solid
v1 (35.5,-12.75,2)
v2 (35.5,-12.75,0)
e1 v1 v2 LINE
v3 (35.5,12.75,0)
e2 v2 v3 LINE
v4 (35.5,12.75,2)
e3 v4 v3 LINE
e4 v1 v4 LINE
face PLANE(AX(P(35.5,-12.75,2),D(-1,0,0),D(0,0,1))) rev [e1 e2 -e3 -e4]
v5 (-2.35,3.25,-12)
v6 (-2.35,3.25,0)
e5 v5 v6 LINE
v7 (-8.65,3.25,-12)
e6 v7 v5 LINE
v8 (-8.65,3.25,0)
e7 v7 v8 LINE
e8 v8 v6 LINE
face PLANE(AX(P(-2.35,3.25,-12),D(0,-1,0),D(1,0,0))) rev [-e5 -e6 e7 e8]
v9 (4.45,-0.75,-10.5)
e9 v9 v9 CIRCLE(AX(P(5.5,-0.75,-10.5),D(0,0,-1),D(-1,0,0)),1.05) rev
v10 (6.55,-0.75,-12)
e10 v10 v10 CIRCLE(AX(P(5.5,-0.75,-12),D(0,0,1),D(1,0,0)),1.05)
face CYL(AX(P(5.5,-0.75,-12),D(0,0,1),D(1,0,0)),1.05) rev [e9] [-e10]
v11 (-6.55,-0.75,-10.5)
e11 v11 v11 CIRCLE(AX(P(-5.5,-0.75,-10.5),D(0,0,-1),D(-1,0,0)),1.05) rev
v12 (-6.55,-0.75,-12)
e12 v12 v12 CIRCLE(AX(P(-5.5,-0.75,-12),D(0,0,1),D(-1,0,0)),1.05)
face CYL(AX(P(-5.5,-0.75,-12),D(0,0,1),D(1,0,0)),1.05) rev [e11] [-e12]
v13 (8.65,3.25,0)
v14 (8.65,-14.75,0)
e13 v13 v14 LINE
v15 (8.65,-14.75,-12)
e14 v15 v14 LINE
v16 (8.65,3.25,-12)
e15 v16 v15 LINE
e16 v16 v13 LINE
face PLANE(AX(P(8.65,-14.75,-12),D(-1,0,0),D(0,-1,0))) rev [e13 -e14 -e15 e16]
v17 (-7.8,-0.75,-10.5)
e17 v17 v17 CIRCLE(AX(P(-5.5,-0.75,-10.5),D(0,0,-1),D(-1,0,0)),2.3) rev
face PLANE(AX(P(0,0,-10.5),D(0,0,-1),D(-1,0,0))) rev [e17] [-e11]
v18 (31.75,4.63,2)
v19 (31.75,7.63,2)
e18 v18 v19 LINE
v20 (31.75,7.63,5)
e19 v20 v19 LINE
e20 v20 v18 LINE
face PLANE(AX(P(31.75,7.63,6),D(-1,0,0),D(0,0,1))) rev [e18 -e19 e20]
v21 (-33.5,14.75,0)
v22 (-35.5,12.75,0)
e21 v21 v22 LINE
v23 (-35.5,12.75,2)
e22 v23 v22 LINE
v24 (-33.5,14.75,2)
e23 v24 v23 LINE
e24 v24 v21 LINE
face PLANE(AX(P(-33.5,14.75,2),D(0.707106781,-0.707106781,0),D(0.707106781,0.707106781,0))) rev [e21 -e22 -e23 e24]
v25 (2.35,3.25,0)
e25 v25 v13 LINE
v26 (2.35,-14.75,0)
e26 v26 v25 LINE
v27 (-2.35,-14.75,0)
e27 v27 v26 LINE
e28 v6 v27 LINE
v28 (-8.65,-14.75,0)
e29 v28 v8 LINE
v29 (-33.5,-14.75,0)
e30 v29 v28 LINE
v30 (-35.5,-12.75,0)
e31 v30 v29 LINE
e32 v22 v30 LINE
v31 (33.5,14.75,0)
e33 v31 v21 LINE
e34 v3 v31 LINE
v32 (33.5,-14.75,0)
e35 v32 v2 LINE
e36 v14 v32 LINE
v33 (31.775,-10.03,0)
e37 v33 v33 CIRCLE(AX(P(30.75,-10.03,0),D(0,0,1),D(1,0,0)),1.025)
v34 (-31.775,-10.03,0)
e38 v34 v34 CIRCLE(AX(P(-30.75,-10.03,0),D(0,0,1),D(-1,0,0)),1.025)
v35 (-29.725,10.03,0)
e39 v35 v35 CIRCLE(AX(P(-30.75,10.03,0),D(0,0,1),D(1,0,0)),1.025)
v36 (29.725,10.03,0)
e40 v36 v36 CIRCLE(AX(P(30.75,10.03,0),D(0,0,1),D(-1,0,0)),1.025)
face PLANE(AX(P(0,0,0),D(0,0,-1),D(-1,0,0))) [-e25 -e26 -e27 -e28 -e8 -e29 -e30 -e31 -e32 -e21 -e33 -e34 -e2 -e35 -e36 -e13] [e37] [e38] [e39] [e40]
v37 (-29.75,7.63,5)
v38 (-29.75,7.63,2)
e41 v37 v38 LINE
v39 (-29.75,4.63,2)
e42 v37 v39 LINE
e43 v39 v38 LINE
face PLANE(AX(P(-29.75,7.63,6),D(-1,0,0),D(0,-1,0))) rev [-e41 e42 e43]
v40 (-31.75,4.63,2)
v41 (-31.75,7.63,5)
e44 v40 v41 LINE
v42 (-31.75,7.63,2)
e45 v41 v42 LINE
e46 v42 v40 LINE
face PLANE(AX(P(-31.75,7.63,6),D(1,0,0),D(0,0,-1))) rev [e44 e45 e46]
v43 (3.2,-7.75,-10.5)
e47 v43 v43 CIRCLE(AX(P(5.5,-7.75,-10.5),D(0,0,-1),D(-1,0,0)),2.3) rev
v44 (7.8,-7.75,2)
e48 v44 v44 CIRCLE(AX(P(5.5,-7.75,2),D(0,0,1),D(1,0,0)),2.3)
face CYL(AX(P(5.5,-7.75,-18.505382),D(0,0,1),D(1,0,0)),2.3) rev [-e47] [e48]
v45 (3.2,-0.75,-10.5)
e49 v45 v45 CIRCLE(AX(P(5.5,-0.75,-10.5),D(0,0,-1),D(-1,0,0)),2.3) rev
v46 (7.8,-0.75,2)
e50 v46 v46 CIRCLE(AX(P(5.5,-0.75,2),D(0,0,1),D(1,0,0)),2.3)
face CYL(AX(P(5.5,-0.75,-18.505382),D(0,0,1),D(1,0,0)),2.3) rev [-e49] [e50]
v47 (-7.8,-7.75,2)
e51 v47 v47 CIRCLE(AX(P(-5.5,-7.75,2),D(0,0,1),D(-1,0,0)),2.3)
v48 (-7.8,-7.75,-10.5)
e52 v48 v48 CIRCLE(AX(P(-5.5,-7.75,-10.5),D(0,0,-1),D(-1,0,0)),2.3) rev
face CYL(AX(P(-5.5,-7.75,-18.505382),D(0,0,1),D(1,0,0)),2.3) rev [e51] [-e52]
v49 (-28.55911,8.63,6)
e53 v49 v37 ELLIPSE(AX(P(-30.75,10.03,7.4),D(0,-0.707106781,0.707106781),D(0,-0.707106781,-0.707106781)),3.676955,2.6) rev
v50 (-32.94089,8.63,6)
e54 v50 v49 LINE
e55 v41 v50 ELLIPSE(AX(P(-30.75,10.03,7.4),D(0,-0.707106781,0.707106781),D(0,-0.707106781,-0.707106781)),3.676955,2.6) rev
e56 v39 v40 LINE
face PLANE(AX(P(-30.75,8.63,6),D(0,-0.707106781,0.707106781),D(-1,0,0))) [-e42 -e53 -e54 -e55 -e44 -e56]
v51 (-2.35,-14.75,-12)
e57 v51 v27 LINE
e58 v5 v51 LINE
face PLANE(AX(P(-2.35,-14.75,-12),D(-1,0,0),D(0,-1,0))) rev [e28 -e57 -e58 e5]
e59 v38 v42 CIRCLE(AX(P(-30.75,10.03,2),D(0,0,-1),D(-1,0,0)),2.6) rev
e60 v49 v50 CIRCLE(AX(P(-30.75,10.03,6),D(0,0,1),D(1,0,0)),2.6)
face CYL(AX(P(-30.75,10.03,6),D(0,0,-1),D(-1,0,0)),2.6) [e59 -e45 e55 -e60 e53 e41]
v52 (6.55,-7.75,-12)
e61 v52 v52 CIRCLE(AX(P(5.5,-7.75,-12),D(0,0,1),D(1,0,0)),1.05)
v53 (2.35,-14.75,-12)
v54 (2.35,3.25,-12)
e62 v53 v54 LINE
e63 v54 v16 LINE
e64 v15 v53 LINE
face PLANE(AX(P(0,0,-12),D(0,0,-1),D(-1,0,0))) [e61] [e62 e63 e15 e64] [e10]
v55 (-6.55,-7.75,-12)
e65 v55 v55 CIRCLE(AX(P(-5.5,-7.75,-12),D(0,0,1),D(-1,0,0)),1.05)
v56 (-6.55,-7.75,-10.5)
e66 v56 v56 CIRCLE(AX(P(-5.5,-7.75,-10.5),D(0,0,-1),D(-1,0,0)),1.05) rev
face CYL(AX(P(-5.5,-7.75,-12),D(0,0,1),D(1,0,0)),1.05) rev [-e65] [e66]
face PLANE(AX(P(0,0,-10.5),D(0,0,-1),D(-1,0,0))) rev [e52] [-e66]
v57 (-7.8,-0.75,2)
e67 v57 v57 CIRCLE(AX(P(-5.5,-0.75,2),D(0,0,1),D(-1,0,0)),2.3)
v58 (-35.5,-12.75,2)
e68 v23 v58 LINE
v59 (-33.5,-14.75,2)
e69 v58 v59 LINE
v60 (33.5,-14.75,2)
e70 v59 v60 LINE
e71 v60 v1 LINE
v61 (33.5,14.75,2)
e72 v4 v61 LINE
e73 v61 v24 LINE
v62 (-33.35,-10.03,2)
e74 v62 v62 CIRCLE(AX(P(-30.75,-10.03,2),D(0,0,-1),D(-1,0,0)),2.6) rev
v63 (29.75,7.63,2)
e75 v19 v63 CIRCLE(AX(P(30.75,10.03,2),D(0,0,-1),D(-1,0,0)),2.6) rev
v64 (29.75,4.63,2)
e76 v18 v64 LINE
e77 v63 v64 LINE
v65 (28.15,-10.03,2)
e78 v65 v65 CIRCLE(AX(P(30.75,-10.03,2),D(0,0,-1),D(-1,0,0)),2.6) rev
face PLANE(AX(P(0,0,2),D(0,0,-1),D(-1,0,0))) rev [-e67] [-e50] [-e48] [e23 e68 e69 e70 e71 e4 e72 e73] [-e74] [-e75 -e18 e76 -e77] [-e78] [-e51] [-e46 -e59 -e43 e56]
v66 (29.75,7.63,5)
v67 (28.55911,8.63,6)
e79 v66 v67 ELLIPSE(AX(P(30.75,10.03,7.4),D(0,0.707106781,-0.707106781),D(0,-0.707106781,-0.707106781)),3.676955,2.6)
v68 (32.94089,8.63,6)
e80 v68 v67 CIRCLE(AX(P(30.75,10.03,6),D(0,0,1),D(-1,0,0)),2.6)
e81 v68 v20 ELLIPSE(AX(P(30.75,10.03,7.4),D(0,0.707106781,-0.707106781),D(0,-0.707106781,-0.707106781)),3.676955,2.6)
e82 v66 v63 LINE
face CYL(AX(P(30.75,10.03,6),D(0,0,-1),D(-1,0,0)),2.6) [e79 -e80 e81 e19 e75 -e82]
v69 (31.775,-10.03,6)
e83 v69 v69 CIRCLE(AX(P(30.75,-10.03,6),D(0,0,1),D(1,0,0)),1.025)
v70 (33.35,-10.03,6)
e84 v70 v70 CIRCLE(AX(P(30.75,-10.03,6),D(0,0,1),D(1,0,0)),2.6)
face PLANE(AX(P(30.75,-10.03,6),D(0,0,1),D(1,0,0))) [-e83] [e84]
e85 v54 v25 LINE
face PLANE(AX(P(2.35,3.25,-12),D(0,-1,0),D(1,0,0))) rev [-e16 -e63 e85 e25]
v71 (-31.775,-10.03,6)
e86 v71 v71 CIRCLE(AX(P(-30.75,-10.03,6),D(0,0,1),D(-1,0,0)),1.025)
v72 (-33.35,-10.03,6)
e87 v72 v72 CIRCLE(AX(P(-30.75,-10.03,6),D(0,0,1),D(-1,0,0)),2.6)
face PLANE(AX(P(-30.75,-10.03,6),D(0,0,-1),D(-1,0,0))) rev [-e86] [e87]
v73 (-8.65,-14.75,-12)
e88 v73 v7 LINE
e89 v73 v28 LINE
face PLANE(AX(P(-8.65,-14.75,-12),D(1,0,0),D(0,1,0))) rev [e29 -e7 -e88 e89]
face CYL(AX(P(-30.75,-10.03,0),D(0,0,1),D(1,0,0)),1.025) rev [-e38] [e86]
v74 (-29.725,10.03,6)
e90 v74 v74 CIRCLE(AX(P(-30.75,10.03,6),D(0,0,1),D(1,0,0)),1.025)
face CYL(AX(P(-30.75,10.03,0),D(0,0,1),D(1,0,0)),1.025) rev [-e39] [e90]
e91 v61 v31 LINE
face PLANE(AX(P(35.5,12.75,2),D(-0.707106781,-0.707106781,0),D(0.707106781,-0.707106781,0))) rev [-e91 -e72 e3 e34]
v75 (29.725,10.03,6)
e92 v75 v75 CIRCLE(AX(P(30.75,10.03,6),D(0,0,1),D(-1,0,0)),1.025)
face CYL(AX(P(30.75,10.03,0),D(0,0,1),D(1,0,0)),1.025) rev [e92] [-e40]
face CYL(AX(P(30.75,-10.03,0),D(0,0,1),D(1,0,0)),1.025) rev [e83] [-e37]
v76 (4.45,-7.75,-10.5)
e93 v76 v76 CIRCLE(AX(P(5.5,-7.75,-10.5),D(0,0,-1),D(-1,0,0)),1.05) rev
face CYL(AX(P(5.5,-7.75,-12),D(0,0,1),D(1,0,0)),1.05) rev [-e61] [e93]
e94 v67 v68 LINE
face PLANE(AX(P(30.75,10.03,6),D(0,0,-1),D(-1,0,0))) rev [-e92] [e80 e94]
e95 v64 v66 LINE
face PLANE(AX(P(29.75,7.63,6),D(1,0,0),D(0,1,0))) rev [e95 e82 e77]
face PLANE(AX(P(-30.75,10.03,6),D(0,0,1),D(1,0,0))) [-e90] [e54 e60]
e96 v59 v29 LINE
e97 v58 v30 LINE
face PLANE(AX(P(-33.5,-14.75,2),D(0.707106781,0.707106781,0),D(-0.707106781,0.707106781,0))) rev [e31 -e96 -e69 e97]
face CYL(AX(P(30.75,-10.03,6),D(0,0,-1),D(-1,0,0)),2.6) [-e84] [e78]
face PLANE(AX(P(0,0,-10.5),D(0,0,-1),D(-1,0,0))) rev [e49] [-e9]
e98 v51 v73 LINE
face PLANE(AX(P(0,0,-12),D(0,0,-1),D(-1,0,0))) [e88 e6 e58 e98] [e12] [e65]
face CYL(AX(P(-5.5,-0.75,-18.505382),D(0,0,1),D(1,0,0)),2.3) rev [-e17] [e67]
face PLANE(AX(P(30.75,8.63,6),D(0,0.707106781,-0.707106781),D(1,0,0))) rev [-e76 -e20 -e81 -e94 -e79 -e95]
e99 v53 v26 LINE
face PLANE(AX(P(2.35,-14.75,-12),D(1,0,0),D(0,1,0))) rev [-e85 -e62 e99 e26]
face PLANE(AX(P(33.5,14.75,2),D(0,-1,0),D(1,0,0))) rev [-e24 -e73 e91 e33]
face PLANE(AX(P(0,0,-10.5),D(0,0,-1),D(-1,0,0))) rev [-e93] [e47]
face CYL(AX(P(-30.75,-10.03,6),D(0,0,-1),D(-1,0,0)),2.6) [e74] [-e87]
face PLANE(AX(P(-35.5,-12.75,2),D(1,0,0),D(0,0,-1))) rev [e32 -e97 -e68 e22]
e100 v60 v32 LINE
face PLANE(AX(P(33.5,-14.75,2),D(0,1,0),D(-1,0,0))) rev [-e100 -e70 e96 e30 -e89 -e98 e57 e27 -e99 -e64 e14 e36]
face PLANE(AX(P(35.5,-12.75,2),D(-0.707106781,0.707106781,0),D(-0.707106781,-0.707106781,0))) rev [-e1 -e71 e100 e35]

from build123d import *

# Parameters (mm, degrees)
BOSS_EXTRUDE1_DEPTH = 2
SKETCH5_R           = 2.6
BOSS_EXTRUDE4_DEPTH = 4
SKETCH6_R           = 1.025
CUT_EXTRUDE1_DEPTH  = 39.907743445
BOSS_EXTRUDE6_DEPTH = 4
CHAMFER1_SIZE       = 5
SKETCH8_W           = 6.3
SKETCH8_H           = 18
BOSS_EXTRUDE8_DEPTH = 12
SKETCH9_R           = 1.05
CUT_EXTRUDE3_DEPTH  = 41.912253666
SKETCH10_R          = 2.3
CUT_EXTRUDE4_DEPTH  = 12.5


with BuildPart() as part:
    # Sketch1 → Boss-Extrude1 (new body)
    with BuildSketch(Plane.XY):
        Polygon((-33.5, 14.75), (-35.5, 12.75), (-35.5, -12.75), (-33.5, -14.75), (33.5, -14.75), (35.5, -12.75), (35.5, 12.75), (33.5, 14.75), align=None)
    extrude(amount=BOSS_EXTRUDE1_DEPTH)

    # Sketch5 → Boss-Extrude4 (add)
    with BuildSketch(Plane.XY.offset(2)):
        with Locations(Location((-30.75, 10.03, 0), (0, 0, 180))):
            Circle(SKETCH5_R)
        with Locations(Location((30.75, 10.03, 0), (0, 0, 180))):
            Circle(SKETCH5_R)
        with Locations(Location((30.75, -10.03, 0), (0, 0, 180))):
            Circle(SKETCH5_R)
        with Locations(Location((-30.75, -10.03, 0), (0, 0, 180))):
            Circle(SKETCH5_R)
    extrude(amount=BOSS_EXTRUDE4_DEPTH)

    # Sketch6 → Cut-Extrude1 (cut, through all)
    with BuildSketch(Plane.XY.offset(6)):
        with Locations((-30.75, 10.03)):
            Circle(SKETCH6_R)
        with Locations(Location((30.75, 10.03, 0), (0, 0, 180))):
            Circle(SKETCH6_R)
        with Locations((30.75, -10.03)):
            Circle(SKETCH6_R)
        with Locations(Location((-30.75, -10.03, 0), (0, 0, 180))):
            Circle(SKETCH6_R)
    extrude(amount=-CUT_EXTRUDE1_DEPTH, mode=Mode.SUBTRACT)

    # Sketch7 → Boss-Extrude6 (add)
    with BuildSketch(Plane.XY.offset(2)):
        with BuildLine():
            Line((-31.75, 7.63), (-31.75, 3.63))
            Line((-31.75, 3.63), (-29.75, 3.63))
            Line((-29.75, 3.63), (-29.75, 7.63))
            ThreePointArc((-29.75, 7.63), (-30.75, 7.43), (-31.75, 7.63))
        make_face()
        with BuildLine():
            Line((29.75, 7.63), (29.75, 3.63))
            Line((29.75, 3.63), (31.75, 3.63))
            Line((31.75, 3.63), (31.75, 7.63))
            ThreePointArc((31.75, 7.63), (30.75, 7.43), (29.75, 7.63))
        make_face()
    extrude(amount=BOSS_EXTRUDE6_DEPTH)

    # Chamfer1
    # the kernel refuses this chamfer: 5 mm, written as the material it takes off along each edge
    with BuildSketch(Plane(origin=(16.89158506, 3.63, 6), x_dir=(0, 0.9996219169112968, 0.027495876610586317), z_dir=(1, 0, 0))) as chamfer1_piece_1_section:
        Polygon((CHAMFER1_SIZE * 0.999621916911, -CHAMFER1_SIZE * 0.0274958766106), (-CHAMFER1_SIZE * 0.0274958766106, -CHAMFER1_SIZE * 0.999621916911), (0, 0), align=None)
    chamfer1_piece_1 = extrude(amount=27.71682988, mode=Mode.PRIVATE)
    chamfer1_piece_1 = split(chamfer1_piece_1, bisect_by=Plane(origin=(30.75, 5.358592062, 2), z_dir=(0, 0, 1)), keep=Keep.TOP, mode=Mode.PRIVATE)
    add(chamfer1_piece_1, mode=Mode.SUBTRACT)
    with BuildSketch(Plane(origin=(-44.60841494, 3.63, 6), x_dir=(0, 0.9996219169112968, 0.027495876610586317), z_dir=(1, 0, 0))) as chamfer1_piece_2_section:
        Polygon((CHAMFER1_SIZE * 0.999621916911, -CHAMFER1_SIZE * 0.0274958766106), (-CHAMFER1_SIZE * 0.0274958766106, -CHAMFER1_SIZE * 0.999621916911), (0, 0), align=None)
    chamfer1_piece_2 = extrude(amount=27.71682988, mode=Mode.PRIVATE)
    chamfer1_piece_2 = split(chamfer1_piece_2, bisect_by=Plane(origin=(-30.75, 5.358592062, 2), z_dir=(0, 0, 1)), keep=Keep.TOP, mode=Mode.PRIVATE)
    add(chamfer1_piece_2, mode=Mode.SUBTRACT)

    # Sketch8 → Boss-Extrude8 (add)
    with BuildSketch(Plane(origin=(0, 0, 0), x_dir=(-1, 0, 0), z_dir=(0, 0, -1))):
        with Locations((-5.5, -5.75)):
            Rectangle(SKETCH8_W, SKETCH8_H)
        with Locations((5.5, -5.75)):
            Rectangle(SKETCH8_W, SKETCH8_H)
    extrude(amount=BOSS_EXTRUDE8_DEPTH)

    # Sketch9 → Cut-Extrude3 (cut, through all)
    with BuildSketch(Plane.XY.offset(2)):
        with Locations((5.5, -7.75)):
            Circle(SKETCH9_R)
        with Locations((5.5, -0.75)):
            Circle(SKETCH9_R)
        with Locations(Location((-5.5, -0.75, 0), (0, 0, 180))):
            Circle(SKETCH9_R)
        with Locations(Location((-5.5, -7.75, 0), (0, 0, 180))):
            Circle(SKETCH9_R)
    extrude(amount=-CUT_EXTRUDE3_DEPTH, mode=Mode.SUBTRACT)

    # Sketch10 → Cut-Extrude4 (cut)
    with BuildSketch(Plane.XY.offset(2)):
        with Locations((5.5, -7.75)):
            Circle(SKETCH10_R)
        with Locations((5.5, -0.75)):
            Circle(SKETCH10_R)
        with Locations(Location((-5.5, -0.75, 0), (0, 0, 180))):
            Circle(SKETCH10_R)
        with Locations(Location((-5.5, -7.75, 0), (0, 0, 180))):
            Circle(SKETCH10_R)
    extrude(amount=-CUT_EXTRUDE4_DEPTH, mode=Mode.SUBTRACT)


solid = part.part
